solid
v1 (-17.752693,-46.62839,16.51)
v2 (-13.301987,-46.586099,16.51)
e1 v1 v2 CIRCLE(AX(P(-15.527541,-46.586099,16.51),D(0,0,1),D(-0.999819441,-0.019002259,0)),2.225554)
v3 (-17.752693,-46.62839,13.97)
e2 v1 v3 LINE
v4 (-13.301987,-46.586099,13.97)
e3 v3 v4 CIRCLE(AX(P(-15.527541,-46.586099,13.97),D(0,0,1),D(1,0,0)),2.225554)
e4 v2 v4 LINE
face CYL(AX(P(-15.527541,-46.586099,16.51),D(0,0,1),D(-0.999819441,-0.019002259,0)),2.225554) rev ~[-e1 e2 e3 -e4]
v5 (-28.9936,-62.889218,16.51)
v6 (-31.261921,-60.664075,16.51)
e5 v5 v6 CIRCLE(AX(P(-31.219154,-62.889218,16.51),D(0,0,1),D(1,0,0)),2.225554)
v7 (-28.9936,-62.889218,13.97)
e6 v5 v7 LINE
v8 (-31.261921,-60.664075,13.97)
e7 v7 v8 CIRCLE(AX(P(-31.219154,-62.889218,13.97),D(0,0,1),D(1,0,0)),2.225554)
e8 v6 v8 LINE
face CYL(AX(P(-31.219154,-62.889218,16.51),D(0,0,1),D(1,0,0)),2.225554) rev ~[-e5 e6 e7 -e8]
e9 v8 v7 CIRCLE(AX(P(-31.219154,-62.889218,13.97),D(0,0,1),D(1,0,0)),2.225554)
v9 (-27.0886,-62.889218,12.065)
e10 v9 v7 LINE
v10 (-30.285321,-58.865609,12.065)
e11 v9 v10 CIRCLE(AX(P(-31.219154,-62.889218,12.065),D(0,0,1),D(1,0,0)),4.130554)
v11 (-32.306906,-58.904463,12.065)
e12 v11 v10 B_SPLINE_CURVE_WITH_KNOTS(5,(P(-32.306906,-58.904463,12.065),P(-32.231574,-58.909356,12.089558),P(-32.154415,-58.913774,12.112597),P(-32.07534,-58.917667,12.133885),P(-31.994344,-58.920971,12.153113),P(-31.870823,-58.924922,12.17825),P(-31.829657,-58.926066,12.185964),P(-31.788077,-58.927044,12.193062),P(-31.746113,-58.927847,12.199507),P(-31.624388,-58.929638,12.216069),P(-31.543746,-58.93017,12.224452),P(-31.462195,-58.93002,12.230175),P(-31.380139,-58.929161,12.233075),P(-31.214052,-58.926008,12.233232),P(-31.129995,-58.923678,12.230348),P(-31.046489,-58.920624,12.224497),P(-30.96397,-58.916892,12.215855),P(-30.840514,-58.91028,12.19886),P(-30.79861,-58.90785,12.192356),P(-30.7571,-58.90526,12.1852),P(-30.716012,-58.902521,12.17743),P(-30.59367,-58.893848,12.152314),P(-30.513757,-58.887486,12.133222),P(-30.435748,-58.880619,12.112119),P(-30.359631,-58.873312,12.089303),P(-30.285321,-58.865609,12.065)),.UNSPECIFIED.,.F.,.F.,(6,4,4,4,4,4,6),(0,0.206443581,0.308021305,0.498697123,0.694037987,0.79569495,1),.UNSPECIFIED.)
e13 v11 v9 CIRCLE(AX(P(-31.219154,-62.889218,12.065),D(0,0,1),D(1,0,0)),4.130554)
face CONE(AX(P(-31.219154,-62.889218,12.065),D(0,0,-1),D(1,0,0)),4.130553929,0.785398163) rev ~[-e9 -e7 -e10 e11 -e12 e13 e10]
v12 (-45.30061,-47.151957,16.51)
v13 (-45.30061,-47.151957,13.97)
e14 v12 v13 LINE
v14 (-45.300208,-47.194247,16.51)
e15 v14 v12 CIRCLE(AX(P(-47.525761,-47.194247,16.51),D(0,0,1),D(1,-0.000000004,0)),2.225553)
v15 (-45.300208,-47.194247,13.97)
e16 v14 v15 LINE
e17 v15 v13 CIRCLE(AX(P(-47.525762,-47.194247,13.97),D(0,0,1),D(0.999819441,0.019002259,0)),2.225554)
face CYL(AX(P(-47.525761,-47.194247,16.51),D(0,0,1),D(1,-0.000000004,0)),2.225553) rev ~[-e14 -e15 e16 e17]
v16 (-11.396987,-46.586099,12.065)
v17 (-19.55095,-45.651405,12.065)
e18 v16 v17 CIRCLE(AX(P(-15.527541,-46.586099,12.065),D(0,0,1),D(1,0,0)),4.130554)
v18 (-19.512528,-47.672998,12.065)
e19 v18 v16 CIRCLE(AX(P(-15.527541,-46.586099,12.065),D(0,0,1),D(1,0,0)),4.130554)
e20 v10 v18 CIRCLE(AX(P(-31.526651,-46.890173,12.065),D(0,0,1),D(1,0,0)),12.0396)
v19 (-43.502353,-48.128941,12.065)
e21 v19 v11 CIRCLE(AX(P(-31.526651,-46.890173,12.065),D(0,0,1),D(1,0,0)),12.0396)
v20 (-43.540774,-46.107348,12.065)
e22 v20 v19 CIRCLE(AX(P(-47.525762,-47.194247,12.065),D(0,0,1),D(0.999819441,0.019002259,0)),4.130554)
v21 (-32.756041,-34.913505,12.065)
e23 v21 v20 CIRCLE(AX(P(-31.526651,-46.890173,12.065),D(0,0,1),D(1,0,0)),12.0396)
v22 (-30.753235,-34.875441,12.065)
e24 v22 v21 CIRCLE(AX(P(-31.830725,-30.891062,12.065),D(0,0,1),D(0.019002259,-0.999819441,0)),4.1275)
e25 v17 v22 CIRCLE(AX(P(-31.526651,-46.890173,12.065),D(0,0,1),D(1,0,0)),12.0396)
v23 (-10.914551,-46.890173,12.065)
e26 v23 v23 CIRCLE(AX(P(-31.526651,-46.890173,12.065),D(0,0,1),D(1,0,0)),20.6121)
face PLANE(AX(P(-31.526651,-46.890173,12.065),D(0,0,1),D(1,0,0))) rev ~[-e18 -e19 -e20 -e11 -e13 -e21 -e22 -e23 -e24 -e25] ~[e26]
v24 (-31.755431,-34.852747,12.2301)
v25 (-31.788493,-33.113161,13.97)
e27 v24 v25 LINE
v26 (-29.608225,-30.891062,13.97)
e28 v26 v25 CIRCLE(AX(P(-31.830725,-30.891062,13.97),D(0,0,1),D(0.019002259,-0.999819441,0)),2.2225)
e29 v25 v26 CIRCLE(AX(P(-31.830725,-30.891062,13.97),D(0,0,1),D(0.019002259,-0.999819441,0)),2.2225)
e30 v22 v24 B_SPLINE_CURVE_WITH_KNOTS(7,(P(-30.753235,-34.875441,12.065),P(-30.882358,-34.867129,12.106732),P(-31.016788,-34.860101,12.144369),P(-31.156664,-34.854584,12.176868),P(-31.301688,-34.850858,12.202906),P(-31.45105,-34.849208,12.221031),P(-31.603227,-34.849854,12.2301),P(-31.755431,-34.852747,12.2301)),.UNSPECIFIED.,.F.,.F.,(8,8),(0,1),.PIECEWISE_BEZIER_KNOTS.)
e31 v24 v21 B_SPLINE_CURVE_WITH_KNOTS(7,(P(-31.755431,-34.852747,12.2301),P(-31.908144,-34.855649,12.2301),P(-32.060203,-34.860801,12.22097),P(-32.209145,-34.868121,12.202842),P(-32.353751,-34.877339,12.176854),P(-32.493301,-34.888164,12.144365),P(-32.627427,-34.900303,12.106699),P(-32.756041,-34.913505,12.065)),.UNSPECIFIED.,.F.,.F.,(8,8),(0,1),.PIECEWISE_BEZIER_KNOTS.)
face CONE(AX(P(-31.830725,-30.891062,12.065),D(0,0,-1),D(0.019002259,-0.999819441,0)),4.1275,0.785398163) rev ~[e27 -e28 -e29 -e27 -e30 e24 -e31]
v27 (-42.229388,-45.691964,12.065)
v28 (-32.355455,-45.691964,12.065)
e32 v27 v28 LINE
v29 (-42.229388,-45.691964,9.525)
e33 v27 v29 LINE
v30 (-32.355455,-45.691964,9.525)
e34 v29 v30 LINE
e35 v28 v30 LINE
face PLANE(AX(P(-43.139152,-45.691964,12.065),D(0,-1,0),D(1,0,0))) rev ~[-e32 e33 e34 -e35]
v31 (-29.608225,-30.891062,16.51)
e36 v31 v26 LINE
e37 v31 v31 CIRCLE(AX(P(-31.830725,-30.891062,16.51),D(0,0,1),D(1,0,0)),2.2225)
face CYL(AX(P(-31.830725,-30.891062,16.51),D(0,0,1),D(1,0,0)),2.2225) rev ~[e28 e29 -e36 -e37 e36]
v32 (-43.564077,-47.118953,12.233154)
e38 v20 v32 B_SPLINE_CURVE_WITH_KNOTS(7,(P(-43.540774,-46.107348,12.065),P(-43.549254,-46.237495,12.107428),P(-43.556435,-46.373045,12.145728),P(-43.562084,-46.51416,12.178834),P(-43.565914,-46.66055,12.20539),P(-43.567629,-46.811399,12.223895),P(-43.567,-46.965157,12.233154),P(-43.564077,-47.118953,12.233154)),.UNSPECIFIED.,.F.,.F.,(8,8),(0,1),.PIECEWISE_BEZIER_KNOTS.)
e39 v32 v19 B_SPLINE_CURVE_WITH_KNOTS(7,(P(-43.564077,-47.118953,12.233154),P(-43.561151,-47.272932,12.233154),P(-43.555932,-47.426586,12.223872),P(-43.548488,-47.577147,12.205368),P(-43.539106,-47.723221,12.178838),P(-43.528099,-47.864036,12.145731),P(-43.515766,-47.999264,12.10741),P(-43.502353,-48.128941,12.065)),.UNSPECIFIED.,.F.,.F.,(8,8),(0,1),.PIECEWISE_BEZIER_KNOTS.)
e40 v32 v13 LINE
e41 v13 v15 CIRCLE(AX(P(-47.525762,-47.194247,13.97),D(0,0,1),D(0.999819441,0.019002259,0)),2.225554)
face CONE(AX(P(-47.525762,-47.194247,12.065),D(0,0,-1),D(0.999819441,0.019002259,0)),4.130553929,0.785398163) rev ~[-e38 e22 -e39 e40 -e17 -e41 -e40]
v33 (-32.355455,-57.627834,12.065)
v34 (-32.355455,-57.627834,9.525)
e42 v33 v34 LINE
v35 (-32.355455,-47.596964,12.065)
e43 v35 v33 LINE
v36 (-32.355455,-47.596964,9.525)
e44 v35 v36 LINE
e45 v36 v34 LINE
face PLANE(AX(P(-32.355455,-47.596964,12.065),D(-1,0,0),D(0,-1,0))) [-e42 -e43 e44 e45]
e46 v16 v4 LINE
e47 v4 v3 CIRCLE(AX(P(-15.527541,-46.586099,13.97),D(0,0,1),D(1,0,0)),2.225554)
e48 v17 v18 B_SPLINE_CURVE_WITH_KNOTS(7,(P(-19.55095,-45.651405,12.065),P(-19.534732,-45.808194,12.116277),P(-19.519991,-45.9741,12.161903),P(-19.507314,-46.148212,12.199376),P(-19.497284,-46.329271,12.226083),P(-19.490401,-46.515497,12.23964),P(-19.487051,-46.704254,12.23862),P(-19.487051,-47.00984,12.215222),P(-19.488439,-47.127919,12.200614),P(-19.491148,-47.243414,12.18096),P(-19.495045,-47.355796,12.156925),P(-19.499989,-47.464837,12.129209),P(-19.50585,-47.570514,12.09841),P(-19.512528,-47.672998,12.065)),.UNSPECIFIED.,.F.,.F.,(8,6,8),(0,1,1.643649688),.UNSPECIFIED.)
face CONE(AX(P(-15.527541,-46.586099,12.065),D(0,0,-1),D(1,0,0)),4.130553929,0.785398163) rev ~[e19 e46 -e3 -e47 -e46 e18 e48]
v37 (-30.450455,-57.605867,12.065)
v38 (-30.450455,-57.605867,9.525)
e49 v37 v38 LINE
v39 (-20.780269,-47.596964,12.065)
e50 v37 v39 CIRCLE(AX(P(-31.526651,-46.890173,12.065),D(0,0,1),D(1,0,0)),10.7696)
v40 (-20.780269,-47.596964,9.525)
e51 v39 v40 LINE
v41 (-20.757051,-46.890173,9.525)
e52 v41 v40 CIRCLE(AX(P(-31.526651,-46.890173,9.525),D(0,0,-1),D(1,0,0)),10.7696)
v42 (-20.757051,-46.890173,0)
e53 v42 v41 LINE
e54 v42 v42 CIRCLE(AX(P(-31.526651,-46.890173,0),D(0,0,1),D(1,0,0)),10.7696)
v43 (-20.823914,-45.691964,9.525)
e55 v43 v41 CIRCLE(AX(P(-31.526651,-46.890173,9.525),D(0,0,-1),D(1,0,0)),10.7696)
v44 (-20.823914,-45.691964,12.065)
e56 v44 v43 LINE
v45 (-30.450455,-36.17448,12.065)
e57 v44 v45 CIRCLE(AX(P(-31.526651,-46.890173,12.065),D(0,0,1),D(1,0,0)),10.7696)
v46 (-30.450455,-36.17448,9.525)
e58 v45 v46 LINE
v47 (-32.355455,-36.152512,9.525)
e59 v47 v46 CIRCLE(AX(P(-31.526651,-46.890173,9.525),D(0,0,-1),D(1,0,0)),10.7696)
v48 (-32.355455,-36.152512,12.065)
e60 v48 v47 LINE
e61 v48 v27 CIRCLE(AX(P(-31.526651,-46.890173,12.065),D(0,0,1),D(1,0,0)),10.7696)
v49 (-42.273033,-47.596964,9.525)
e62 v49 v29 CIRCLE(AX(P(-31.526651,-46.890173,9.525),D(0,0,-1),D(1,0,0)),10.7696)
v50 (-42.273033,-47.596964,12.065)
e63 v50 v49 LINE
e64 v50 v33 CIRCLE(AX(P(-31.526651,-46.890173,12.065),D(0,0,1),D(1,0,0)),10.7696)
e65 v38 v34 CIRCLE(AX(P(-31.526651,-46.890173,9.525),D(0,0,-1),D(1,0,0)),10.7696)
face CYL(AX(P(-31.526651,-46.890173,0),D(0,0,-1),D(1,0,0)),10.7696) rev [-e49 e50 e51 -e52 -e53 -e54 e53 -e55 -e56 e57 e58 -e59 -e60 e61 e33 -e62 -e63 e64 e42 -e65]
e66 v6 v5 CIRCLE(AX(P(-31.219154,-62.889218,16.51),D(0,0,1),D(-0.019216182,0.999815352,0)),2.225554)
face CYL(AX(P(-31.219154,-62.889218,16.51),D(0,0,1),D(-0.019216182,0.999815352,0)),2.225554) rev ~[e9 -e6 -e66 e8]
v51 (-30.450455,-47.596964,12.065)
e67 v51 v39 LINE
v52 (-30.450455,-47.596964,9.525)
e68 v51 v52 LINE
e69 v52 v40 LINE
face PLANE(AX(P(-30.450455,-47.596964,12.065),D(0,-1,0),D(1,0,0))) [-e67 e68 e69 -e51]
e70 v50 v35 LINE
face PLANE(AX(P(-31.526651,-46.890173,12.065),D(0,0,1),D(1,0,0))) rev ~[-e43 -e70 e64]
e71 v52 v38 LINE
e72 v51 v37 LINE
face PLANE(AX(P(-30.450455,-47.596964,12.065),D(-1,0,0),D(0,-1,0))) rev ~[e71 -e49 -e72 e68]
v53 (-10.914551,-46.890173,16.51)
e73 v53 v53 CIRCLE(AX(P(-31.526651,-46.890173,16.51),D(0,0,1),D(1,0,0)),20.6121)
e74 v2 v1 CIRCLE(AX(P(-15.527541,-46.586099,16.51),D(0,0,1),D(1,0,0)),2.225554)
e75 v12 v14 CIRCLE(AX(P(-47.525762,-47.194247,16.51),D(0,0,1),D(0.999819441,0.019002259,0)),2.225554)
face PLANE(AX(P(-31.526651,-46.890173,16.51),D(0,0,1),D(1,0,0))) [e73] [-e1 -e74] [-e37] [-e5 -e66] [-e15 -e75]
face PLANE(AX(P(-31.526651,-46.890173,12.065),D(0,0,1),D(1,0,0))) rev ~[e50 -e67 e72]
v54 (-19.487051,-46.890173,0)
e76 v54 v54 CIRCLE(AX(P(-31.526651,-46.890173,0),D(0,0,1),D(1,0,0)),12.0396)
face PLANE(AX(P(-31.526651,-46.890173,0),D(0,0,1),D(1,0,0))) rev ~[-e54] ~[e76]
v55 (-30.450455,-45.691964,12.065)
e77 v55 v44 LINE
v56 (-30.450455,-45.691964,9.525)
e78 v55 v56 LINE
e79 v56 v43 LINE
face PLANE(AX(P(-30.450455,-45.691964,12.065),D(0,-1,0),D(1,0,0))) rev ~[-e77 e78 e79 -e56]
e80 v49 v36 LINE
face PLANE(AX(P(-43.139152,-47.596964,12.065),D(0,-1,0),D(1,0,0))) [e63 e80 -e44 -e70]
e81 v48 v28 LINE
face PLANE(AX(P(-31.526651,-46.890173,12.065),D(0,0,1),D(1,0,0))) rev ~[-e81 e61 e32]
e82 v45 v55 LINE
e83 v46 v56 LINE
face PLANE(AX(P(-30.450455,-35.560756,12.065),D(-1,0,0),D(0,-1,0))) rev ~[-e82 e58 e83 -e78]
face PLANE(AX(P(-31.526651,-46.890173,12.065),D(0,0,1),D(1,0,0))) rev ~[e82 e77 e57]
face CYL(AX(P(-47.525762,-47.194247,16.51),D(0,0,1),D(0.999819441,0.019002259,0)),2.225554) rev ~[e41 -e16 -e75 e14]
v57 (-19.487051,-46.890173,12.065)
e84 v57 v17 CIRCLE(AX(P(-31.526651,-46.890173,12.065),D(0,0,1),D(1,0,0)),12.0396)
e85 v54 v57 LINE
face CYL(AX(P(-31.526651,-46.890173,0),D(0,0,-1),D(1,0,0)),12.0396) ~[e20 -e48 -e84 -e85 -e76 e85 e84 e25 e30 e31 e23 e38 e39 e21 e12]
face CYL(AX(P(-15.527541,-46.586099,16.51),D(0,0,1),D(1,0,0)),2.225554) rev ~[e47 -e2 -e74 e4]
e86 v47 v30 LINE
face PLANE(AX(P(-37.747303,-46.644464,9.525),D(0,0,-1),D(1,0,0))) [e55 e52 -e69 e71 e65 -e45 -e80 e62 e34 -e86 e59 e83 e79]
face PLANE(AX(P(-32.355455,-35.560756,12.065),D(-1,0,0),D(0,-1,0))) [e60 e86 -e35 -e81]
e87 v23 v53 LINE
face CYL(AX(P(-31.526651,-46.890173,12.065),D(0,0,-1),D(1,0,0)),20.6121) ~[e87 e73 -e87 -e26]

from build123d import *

# Parameters (mm, degrees)
F0_R         = 12.0396
F0_R_2       = 10.7696
F1_DEPTH     = 12.065
F2_R         = 20.6121
F3_DEPTH     = 4.445
F5_DEPTH     = 16.511
F6_S5_R      = 12.0396
F6_T6_DEPTH  = 7
F6_S11_R     = 12.0396
F6_T12_DEPTH = 7
F6_S17_R     = 12.0396
F6_T18_DEPTH = 7
F6_S23_R     = 12.0396
F6_T24_DEPTH = 7
F7_W         = 10.7836972851
F7_H         = 1.905
F7_W_2       = 1.905
F7_H_2       = 10.8237928489
F7_W_3       = 10.1713027149
F7_H_3       = 10.1312071511
F8_DEPTH     = 2.54


# Not quite as in the source:
# - a fillet or chamfer that OpenCascade refuses, or shapes differently, is made with other operations: its cross-section is extruded or revolved along the edge and cut away or added


with BuildPart() as f1:
    # F0 (on Top) → F1 (new body)
    with BuildSketch(Plane.XY):
        with Locations((-31.5266512334, -46.8901731074)):
            Circle(F0_R)
        with Locations((-31.5266512334, -46.8901731074)):
            Circle(F0_R_2, mode=Mode.SUBTRACT)
    extrude(amount=F1_DEPTH)

    # F2 (on face) → F3 (join)
    with BuildSketch(Plane.XY.offset(12.065)):
        with Locations((-31.5266512334, -46.8901731074)):
            Circle(F2_R)
    extrude(amount=F3_DEPTH)

    # F4 (on face) → F5 (cut, through all)
    with BuildSketch(Plane.XY.offset(16.51)):
        with BuildLine():
            ThreePointArc((-31.7884928641, -33.1131611233), (-30.2443193797, -32.4476041714), (-29.6082253852, -30.8910624162))
            ThreePointArc((-29.6082253852, -30.8910624162), (-33.4171313906, -29.3345206609), (-31.7884928641, -33.1131611233))
        make_face()
        with BuildLine():
            ThreePointArc((-13.3019866134, -46.5860989557), (-15.5486867731, -44.3606454902), (-17.7526926267, -46.6283895083))
            ThreePointArc((-17.7526926267, -46.6283895083), (-15.5063943113, -48.8115524211), (-13.3019866134, -46.5860989557))
        make_face()
        with BuildLine():
            ThreePointArc((-28.9935999678, -62.8892183723), (-29.6606432601, -61.3004657527), (-31.2619205449, -60.6640753873))
            ThreePointArc((-31.2619205449, -60.6640753873), (-32.777664533, -64.4779709918), (-28.9935999678, -62.8892183723))
        make_face()
        with BuildLine():
            ThreePointArc((-45.3002079959, -47.1942472591), (-45.3003084592, -47.1731010282), (-45.3006098402, -47.1519567065))
            ThreePointArc((-45.3006098402, -47.1519567065), (-49.7512153901, -47.21539349), (-45.3002079959, -47.1942472591))
        make_face()
    extrude(amount=-F5_DEPTH, mode=Mode.SUBTRACT)

    # F6: chamfer of 1.905 on 4 edges, made by hand


with BuildPart() as f6_tool2:
    # F6_s3 → F6_t4 (revolve)
    with BuildSketch(Plane.XZ.offset(62.8892183723)):
        Polygon((-27.0885999678, 12.065), (-28.9935999678, 13.97), (-28.9935999678, 12.065), align=None)
    revolve(axis=Axis((-31.2191538966, -62.8892183723, 12.065), (0, 0, 1)))

    # F6_s5 → F6_t6 (cut, symmetric)
    with BuildSketch(Plane.XY.offset(13)):
        with Locations((-31.5266512334, -46.8901731074)):
            Circle(F6_S5_R)
    extrude(amount=F6_T6_DEPTH, both=True, mode=Mode.SUBTRACT)


with BuildPart() as f1_1:
    add(f1.part)

    # F6_t1: cut F6_tool2
    add(f6_tool2.part, mode=Mode.SUBTRACT)


with BuildPart() as f6_tool8:
    # F6_s9 → F6_t10 (revolve)
    with BuildSketch(Plane.XZ.offset(46.5860989557)):
        Polygon((-11.3969866134, 12.065), (-13.3019866134, 13.97), (-13.3019866134, 12.065), align=None)
    revolve(axis=Axis((-15.5275405422, -46.5860989557, 12.065), (0, 0, 1)))

    # F6_s11 → F6_t12 (cut, symmetric)
    with BuildSketch(Plane.XY.offset(13)):
        with Locations((-31.5266512334, -46.8901731074)):
            Circle(F6_S11_R)
    extrude(amount=F6_T12_DEPTH, both=True, mode=Mode.SUBTRACT)


with BuildPart() as f1_2:
    add(f1_1.part)

    # F6_t7: cut F6_tool8
    add(f6_tool8.part, mode=Mode.SUBTRACT)


with BuildPart() as f6_tool14:
    # F6_s15 → F6_t16 (revolve)
    with BuildSketch(Plane(origin=(0.8794745138, -46.2742722997, 0), x_dir=(0, 0, 1), z_dir=(0.0190022592, -0.9998194408, 0))):
        Polygon((12.065, 44.2834241002), (13.97, 46.1884241002), (12.065, 46.1884241002), align=None)
    revolve(axis=Axis((-47.5257619247, -47.1942472591, 12.065), (0, 0, 1)))

    # F6_s17 → F6_t18 (cut, symmetric)
    with BuildSketch(Plane.XY.offset(13)):
        with Locations((-31.5266512334, -46.8901731074)):
            Circle(F6_S17_R)
    extrude(amount=F6_T18_DEPTH, both=True, mode=Mode.SUBTRACT)


with BuildPart() as f1_3:
    add(f1_2.part)

    # F6_t13: cut F6_tool14
    add(f6_tool14.part, mode=Mode.SUBTRACT)


with BuildPart() as f6_tool20:
    # F6_s21 → F6_t22 (revolve)
    with BuildSketch(Plane(origin=(-32.4061257472, -0.6159008077, 0), x_dir=(0, 0, 1), z_dir=(-0.9998194408, -0.0190022592, 0))):
        Polygon((12.065, -34.4081290555), (13.97, -32.5031290555), (12.065, -32.5031290555), align=None)
    revolve(axis=Axis((-31.8307253852, -30.8910624162, 12.065), (0, 0, 1)))

    # F6_s23 → F6_t24 (cut, symmetric)
    with BuildSketch(Plane.XY.offset(13)):
        with Locations((-31.5266512334, -46.8901731074)):
            Circle(F6_S23_R)
    extrude(amount=F6_T24_DEPTH, both=True, mode=Mode.SUBTRACT)


with BuildPart() as f1_4:
    add(f1_3.part)

    # F6_t19: cut F6_tool20
    add(f6_tool20.part, mode=Mode.SUBTRACT)

    # F7 (on face) → F8 (join)
    with BuildSketch(Plane(origin=(0, 0, 12.065), x_dir=(1, 0, 0), z_dir=(0, 0, -1))):
        with Locations((-37.7473032813, 46.6444636265)):
            Rectangle(F7_W, F7_H)
        with Locations((-31.4029546387, 53.008860051)):
            Rectangle(F7_W_2, F7_H_2)
        with Locations((-31.4029546387, 46.6444636265)):
            Rectangle(F7_W_2, F7_H)
        with Locations((-25.3648032813, 46.6444636265)):
            Rectangle(F7_W_3, F7_H)
        with Locations((-31.4029546387, 40.626360051)):
            Rectangle(F7_W_2, F7_H_3)
    extrude(amount=F8_DEPTH)


solid = f1_4.part
